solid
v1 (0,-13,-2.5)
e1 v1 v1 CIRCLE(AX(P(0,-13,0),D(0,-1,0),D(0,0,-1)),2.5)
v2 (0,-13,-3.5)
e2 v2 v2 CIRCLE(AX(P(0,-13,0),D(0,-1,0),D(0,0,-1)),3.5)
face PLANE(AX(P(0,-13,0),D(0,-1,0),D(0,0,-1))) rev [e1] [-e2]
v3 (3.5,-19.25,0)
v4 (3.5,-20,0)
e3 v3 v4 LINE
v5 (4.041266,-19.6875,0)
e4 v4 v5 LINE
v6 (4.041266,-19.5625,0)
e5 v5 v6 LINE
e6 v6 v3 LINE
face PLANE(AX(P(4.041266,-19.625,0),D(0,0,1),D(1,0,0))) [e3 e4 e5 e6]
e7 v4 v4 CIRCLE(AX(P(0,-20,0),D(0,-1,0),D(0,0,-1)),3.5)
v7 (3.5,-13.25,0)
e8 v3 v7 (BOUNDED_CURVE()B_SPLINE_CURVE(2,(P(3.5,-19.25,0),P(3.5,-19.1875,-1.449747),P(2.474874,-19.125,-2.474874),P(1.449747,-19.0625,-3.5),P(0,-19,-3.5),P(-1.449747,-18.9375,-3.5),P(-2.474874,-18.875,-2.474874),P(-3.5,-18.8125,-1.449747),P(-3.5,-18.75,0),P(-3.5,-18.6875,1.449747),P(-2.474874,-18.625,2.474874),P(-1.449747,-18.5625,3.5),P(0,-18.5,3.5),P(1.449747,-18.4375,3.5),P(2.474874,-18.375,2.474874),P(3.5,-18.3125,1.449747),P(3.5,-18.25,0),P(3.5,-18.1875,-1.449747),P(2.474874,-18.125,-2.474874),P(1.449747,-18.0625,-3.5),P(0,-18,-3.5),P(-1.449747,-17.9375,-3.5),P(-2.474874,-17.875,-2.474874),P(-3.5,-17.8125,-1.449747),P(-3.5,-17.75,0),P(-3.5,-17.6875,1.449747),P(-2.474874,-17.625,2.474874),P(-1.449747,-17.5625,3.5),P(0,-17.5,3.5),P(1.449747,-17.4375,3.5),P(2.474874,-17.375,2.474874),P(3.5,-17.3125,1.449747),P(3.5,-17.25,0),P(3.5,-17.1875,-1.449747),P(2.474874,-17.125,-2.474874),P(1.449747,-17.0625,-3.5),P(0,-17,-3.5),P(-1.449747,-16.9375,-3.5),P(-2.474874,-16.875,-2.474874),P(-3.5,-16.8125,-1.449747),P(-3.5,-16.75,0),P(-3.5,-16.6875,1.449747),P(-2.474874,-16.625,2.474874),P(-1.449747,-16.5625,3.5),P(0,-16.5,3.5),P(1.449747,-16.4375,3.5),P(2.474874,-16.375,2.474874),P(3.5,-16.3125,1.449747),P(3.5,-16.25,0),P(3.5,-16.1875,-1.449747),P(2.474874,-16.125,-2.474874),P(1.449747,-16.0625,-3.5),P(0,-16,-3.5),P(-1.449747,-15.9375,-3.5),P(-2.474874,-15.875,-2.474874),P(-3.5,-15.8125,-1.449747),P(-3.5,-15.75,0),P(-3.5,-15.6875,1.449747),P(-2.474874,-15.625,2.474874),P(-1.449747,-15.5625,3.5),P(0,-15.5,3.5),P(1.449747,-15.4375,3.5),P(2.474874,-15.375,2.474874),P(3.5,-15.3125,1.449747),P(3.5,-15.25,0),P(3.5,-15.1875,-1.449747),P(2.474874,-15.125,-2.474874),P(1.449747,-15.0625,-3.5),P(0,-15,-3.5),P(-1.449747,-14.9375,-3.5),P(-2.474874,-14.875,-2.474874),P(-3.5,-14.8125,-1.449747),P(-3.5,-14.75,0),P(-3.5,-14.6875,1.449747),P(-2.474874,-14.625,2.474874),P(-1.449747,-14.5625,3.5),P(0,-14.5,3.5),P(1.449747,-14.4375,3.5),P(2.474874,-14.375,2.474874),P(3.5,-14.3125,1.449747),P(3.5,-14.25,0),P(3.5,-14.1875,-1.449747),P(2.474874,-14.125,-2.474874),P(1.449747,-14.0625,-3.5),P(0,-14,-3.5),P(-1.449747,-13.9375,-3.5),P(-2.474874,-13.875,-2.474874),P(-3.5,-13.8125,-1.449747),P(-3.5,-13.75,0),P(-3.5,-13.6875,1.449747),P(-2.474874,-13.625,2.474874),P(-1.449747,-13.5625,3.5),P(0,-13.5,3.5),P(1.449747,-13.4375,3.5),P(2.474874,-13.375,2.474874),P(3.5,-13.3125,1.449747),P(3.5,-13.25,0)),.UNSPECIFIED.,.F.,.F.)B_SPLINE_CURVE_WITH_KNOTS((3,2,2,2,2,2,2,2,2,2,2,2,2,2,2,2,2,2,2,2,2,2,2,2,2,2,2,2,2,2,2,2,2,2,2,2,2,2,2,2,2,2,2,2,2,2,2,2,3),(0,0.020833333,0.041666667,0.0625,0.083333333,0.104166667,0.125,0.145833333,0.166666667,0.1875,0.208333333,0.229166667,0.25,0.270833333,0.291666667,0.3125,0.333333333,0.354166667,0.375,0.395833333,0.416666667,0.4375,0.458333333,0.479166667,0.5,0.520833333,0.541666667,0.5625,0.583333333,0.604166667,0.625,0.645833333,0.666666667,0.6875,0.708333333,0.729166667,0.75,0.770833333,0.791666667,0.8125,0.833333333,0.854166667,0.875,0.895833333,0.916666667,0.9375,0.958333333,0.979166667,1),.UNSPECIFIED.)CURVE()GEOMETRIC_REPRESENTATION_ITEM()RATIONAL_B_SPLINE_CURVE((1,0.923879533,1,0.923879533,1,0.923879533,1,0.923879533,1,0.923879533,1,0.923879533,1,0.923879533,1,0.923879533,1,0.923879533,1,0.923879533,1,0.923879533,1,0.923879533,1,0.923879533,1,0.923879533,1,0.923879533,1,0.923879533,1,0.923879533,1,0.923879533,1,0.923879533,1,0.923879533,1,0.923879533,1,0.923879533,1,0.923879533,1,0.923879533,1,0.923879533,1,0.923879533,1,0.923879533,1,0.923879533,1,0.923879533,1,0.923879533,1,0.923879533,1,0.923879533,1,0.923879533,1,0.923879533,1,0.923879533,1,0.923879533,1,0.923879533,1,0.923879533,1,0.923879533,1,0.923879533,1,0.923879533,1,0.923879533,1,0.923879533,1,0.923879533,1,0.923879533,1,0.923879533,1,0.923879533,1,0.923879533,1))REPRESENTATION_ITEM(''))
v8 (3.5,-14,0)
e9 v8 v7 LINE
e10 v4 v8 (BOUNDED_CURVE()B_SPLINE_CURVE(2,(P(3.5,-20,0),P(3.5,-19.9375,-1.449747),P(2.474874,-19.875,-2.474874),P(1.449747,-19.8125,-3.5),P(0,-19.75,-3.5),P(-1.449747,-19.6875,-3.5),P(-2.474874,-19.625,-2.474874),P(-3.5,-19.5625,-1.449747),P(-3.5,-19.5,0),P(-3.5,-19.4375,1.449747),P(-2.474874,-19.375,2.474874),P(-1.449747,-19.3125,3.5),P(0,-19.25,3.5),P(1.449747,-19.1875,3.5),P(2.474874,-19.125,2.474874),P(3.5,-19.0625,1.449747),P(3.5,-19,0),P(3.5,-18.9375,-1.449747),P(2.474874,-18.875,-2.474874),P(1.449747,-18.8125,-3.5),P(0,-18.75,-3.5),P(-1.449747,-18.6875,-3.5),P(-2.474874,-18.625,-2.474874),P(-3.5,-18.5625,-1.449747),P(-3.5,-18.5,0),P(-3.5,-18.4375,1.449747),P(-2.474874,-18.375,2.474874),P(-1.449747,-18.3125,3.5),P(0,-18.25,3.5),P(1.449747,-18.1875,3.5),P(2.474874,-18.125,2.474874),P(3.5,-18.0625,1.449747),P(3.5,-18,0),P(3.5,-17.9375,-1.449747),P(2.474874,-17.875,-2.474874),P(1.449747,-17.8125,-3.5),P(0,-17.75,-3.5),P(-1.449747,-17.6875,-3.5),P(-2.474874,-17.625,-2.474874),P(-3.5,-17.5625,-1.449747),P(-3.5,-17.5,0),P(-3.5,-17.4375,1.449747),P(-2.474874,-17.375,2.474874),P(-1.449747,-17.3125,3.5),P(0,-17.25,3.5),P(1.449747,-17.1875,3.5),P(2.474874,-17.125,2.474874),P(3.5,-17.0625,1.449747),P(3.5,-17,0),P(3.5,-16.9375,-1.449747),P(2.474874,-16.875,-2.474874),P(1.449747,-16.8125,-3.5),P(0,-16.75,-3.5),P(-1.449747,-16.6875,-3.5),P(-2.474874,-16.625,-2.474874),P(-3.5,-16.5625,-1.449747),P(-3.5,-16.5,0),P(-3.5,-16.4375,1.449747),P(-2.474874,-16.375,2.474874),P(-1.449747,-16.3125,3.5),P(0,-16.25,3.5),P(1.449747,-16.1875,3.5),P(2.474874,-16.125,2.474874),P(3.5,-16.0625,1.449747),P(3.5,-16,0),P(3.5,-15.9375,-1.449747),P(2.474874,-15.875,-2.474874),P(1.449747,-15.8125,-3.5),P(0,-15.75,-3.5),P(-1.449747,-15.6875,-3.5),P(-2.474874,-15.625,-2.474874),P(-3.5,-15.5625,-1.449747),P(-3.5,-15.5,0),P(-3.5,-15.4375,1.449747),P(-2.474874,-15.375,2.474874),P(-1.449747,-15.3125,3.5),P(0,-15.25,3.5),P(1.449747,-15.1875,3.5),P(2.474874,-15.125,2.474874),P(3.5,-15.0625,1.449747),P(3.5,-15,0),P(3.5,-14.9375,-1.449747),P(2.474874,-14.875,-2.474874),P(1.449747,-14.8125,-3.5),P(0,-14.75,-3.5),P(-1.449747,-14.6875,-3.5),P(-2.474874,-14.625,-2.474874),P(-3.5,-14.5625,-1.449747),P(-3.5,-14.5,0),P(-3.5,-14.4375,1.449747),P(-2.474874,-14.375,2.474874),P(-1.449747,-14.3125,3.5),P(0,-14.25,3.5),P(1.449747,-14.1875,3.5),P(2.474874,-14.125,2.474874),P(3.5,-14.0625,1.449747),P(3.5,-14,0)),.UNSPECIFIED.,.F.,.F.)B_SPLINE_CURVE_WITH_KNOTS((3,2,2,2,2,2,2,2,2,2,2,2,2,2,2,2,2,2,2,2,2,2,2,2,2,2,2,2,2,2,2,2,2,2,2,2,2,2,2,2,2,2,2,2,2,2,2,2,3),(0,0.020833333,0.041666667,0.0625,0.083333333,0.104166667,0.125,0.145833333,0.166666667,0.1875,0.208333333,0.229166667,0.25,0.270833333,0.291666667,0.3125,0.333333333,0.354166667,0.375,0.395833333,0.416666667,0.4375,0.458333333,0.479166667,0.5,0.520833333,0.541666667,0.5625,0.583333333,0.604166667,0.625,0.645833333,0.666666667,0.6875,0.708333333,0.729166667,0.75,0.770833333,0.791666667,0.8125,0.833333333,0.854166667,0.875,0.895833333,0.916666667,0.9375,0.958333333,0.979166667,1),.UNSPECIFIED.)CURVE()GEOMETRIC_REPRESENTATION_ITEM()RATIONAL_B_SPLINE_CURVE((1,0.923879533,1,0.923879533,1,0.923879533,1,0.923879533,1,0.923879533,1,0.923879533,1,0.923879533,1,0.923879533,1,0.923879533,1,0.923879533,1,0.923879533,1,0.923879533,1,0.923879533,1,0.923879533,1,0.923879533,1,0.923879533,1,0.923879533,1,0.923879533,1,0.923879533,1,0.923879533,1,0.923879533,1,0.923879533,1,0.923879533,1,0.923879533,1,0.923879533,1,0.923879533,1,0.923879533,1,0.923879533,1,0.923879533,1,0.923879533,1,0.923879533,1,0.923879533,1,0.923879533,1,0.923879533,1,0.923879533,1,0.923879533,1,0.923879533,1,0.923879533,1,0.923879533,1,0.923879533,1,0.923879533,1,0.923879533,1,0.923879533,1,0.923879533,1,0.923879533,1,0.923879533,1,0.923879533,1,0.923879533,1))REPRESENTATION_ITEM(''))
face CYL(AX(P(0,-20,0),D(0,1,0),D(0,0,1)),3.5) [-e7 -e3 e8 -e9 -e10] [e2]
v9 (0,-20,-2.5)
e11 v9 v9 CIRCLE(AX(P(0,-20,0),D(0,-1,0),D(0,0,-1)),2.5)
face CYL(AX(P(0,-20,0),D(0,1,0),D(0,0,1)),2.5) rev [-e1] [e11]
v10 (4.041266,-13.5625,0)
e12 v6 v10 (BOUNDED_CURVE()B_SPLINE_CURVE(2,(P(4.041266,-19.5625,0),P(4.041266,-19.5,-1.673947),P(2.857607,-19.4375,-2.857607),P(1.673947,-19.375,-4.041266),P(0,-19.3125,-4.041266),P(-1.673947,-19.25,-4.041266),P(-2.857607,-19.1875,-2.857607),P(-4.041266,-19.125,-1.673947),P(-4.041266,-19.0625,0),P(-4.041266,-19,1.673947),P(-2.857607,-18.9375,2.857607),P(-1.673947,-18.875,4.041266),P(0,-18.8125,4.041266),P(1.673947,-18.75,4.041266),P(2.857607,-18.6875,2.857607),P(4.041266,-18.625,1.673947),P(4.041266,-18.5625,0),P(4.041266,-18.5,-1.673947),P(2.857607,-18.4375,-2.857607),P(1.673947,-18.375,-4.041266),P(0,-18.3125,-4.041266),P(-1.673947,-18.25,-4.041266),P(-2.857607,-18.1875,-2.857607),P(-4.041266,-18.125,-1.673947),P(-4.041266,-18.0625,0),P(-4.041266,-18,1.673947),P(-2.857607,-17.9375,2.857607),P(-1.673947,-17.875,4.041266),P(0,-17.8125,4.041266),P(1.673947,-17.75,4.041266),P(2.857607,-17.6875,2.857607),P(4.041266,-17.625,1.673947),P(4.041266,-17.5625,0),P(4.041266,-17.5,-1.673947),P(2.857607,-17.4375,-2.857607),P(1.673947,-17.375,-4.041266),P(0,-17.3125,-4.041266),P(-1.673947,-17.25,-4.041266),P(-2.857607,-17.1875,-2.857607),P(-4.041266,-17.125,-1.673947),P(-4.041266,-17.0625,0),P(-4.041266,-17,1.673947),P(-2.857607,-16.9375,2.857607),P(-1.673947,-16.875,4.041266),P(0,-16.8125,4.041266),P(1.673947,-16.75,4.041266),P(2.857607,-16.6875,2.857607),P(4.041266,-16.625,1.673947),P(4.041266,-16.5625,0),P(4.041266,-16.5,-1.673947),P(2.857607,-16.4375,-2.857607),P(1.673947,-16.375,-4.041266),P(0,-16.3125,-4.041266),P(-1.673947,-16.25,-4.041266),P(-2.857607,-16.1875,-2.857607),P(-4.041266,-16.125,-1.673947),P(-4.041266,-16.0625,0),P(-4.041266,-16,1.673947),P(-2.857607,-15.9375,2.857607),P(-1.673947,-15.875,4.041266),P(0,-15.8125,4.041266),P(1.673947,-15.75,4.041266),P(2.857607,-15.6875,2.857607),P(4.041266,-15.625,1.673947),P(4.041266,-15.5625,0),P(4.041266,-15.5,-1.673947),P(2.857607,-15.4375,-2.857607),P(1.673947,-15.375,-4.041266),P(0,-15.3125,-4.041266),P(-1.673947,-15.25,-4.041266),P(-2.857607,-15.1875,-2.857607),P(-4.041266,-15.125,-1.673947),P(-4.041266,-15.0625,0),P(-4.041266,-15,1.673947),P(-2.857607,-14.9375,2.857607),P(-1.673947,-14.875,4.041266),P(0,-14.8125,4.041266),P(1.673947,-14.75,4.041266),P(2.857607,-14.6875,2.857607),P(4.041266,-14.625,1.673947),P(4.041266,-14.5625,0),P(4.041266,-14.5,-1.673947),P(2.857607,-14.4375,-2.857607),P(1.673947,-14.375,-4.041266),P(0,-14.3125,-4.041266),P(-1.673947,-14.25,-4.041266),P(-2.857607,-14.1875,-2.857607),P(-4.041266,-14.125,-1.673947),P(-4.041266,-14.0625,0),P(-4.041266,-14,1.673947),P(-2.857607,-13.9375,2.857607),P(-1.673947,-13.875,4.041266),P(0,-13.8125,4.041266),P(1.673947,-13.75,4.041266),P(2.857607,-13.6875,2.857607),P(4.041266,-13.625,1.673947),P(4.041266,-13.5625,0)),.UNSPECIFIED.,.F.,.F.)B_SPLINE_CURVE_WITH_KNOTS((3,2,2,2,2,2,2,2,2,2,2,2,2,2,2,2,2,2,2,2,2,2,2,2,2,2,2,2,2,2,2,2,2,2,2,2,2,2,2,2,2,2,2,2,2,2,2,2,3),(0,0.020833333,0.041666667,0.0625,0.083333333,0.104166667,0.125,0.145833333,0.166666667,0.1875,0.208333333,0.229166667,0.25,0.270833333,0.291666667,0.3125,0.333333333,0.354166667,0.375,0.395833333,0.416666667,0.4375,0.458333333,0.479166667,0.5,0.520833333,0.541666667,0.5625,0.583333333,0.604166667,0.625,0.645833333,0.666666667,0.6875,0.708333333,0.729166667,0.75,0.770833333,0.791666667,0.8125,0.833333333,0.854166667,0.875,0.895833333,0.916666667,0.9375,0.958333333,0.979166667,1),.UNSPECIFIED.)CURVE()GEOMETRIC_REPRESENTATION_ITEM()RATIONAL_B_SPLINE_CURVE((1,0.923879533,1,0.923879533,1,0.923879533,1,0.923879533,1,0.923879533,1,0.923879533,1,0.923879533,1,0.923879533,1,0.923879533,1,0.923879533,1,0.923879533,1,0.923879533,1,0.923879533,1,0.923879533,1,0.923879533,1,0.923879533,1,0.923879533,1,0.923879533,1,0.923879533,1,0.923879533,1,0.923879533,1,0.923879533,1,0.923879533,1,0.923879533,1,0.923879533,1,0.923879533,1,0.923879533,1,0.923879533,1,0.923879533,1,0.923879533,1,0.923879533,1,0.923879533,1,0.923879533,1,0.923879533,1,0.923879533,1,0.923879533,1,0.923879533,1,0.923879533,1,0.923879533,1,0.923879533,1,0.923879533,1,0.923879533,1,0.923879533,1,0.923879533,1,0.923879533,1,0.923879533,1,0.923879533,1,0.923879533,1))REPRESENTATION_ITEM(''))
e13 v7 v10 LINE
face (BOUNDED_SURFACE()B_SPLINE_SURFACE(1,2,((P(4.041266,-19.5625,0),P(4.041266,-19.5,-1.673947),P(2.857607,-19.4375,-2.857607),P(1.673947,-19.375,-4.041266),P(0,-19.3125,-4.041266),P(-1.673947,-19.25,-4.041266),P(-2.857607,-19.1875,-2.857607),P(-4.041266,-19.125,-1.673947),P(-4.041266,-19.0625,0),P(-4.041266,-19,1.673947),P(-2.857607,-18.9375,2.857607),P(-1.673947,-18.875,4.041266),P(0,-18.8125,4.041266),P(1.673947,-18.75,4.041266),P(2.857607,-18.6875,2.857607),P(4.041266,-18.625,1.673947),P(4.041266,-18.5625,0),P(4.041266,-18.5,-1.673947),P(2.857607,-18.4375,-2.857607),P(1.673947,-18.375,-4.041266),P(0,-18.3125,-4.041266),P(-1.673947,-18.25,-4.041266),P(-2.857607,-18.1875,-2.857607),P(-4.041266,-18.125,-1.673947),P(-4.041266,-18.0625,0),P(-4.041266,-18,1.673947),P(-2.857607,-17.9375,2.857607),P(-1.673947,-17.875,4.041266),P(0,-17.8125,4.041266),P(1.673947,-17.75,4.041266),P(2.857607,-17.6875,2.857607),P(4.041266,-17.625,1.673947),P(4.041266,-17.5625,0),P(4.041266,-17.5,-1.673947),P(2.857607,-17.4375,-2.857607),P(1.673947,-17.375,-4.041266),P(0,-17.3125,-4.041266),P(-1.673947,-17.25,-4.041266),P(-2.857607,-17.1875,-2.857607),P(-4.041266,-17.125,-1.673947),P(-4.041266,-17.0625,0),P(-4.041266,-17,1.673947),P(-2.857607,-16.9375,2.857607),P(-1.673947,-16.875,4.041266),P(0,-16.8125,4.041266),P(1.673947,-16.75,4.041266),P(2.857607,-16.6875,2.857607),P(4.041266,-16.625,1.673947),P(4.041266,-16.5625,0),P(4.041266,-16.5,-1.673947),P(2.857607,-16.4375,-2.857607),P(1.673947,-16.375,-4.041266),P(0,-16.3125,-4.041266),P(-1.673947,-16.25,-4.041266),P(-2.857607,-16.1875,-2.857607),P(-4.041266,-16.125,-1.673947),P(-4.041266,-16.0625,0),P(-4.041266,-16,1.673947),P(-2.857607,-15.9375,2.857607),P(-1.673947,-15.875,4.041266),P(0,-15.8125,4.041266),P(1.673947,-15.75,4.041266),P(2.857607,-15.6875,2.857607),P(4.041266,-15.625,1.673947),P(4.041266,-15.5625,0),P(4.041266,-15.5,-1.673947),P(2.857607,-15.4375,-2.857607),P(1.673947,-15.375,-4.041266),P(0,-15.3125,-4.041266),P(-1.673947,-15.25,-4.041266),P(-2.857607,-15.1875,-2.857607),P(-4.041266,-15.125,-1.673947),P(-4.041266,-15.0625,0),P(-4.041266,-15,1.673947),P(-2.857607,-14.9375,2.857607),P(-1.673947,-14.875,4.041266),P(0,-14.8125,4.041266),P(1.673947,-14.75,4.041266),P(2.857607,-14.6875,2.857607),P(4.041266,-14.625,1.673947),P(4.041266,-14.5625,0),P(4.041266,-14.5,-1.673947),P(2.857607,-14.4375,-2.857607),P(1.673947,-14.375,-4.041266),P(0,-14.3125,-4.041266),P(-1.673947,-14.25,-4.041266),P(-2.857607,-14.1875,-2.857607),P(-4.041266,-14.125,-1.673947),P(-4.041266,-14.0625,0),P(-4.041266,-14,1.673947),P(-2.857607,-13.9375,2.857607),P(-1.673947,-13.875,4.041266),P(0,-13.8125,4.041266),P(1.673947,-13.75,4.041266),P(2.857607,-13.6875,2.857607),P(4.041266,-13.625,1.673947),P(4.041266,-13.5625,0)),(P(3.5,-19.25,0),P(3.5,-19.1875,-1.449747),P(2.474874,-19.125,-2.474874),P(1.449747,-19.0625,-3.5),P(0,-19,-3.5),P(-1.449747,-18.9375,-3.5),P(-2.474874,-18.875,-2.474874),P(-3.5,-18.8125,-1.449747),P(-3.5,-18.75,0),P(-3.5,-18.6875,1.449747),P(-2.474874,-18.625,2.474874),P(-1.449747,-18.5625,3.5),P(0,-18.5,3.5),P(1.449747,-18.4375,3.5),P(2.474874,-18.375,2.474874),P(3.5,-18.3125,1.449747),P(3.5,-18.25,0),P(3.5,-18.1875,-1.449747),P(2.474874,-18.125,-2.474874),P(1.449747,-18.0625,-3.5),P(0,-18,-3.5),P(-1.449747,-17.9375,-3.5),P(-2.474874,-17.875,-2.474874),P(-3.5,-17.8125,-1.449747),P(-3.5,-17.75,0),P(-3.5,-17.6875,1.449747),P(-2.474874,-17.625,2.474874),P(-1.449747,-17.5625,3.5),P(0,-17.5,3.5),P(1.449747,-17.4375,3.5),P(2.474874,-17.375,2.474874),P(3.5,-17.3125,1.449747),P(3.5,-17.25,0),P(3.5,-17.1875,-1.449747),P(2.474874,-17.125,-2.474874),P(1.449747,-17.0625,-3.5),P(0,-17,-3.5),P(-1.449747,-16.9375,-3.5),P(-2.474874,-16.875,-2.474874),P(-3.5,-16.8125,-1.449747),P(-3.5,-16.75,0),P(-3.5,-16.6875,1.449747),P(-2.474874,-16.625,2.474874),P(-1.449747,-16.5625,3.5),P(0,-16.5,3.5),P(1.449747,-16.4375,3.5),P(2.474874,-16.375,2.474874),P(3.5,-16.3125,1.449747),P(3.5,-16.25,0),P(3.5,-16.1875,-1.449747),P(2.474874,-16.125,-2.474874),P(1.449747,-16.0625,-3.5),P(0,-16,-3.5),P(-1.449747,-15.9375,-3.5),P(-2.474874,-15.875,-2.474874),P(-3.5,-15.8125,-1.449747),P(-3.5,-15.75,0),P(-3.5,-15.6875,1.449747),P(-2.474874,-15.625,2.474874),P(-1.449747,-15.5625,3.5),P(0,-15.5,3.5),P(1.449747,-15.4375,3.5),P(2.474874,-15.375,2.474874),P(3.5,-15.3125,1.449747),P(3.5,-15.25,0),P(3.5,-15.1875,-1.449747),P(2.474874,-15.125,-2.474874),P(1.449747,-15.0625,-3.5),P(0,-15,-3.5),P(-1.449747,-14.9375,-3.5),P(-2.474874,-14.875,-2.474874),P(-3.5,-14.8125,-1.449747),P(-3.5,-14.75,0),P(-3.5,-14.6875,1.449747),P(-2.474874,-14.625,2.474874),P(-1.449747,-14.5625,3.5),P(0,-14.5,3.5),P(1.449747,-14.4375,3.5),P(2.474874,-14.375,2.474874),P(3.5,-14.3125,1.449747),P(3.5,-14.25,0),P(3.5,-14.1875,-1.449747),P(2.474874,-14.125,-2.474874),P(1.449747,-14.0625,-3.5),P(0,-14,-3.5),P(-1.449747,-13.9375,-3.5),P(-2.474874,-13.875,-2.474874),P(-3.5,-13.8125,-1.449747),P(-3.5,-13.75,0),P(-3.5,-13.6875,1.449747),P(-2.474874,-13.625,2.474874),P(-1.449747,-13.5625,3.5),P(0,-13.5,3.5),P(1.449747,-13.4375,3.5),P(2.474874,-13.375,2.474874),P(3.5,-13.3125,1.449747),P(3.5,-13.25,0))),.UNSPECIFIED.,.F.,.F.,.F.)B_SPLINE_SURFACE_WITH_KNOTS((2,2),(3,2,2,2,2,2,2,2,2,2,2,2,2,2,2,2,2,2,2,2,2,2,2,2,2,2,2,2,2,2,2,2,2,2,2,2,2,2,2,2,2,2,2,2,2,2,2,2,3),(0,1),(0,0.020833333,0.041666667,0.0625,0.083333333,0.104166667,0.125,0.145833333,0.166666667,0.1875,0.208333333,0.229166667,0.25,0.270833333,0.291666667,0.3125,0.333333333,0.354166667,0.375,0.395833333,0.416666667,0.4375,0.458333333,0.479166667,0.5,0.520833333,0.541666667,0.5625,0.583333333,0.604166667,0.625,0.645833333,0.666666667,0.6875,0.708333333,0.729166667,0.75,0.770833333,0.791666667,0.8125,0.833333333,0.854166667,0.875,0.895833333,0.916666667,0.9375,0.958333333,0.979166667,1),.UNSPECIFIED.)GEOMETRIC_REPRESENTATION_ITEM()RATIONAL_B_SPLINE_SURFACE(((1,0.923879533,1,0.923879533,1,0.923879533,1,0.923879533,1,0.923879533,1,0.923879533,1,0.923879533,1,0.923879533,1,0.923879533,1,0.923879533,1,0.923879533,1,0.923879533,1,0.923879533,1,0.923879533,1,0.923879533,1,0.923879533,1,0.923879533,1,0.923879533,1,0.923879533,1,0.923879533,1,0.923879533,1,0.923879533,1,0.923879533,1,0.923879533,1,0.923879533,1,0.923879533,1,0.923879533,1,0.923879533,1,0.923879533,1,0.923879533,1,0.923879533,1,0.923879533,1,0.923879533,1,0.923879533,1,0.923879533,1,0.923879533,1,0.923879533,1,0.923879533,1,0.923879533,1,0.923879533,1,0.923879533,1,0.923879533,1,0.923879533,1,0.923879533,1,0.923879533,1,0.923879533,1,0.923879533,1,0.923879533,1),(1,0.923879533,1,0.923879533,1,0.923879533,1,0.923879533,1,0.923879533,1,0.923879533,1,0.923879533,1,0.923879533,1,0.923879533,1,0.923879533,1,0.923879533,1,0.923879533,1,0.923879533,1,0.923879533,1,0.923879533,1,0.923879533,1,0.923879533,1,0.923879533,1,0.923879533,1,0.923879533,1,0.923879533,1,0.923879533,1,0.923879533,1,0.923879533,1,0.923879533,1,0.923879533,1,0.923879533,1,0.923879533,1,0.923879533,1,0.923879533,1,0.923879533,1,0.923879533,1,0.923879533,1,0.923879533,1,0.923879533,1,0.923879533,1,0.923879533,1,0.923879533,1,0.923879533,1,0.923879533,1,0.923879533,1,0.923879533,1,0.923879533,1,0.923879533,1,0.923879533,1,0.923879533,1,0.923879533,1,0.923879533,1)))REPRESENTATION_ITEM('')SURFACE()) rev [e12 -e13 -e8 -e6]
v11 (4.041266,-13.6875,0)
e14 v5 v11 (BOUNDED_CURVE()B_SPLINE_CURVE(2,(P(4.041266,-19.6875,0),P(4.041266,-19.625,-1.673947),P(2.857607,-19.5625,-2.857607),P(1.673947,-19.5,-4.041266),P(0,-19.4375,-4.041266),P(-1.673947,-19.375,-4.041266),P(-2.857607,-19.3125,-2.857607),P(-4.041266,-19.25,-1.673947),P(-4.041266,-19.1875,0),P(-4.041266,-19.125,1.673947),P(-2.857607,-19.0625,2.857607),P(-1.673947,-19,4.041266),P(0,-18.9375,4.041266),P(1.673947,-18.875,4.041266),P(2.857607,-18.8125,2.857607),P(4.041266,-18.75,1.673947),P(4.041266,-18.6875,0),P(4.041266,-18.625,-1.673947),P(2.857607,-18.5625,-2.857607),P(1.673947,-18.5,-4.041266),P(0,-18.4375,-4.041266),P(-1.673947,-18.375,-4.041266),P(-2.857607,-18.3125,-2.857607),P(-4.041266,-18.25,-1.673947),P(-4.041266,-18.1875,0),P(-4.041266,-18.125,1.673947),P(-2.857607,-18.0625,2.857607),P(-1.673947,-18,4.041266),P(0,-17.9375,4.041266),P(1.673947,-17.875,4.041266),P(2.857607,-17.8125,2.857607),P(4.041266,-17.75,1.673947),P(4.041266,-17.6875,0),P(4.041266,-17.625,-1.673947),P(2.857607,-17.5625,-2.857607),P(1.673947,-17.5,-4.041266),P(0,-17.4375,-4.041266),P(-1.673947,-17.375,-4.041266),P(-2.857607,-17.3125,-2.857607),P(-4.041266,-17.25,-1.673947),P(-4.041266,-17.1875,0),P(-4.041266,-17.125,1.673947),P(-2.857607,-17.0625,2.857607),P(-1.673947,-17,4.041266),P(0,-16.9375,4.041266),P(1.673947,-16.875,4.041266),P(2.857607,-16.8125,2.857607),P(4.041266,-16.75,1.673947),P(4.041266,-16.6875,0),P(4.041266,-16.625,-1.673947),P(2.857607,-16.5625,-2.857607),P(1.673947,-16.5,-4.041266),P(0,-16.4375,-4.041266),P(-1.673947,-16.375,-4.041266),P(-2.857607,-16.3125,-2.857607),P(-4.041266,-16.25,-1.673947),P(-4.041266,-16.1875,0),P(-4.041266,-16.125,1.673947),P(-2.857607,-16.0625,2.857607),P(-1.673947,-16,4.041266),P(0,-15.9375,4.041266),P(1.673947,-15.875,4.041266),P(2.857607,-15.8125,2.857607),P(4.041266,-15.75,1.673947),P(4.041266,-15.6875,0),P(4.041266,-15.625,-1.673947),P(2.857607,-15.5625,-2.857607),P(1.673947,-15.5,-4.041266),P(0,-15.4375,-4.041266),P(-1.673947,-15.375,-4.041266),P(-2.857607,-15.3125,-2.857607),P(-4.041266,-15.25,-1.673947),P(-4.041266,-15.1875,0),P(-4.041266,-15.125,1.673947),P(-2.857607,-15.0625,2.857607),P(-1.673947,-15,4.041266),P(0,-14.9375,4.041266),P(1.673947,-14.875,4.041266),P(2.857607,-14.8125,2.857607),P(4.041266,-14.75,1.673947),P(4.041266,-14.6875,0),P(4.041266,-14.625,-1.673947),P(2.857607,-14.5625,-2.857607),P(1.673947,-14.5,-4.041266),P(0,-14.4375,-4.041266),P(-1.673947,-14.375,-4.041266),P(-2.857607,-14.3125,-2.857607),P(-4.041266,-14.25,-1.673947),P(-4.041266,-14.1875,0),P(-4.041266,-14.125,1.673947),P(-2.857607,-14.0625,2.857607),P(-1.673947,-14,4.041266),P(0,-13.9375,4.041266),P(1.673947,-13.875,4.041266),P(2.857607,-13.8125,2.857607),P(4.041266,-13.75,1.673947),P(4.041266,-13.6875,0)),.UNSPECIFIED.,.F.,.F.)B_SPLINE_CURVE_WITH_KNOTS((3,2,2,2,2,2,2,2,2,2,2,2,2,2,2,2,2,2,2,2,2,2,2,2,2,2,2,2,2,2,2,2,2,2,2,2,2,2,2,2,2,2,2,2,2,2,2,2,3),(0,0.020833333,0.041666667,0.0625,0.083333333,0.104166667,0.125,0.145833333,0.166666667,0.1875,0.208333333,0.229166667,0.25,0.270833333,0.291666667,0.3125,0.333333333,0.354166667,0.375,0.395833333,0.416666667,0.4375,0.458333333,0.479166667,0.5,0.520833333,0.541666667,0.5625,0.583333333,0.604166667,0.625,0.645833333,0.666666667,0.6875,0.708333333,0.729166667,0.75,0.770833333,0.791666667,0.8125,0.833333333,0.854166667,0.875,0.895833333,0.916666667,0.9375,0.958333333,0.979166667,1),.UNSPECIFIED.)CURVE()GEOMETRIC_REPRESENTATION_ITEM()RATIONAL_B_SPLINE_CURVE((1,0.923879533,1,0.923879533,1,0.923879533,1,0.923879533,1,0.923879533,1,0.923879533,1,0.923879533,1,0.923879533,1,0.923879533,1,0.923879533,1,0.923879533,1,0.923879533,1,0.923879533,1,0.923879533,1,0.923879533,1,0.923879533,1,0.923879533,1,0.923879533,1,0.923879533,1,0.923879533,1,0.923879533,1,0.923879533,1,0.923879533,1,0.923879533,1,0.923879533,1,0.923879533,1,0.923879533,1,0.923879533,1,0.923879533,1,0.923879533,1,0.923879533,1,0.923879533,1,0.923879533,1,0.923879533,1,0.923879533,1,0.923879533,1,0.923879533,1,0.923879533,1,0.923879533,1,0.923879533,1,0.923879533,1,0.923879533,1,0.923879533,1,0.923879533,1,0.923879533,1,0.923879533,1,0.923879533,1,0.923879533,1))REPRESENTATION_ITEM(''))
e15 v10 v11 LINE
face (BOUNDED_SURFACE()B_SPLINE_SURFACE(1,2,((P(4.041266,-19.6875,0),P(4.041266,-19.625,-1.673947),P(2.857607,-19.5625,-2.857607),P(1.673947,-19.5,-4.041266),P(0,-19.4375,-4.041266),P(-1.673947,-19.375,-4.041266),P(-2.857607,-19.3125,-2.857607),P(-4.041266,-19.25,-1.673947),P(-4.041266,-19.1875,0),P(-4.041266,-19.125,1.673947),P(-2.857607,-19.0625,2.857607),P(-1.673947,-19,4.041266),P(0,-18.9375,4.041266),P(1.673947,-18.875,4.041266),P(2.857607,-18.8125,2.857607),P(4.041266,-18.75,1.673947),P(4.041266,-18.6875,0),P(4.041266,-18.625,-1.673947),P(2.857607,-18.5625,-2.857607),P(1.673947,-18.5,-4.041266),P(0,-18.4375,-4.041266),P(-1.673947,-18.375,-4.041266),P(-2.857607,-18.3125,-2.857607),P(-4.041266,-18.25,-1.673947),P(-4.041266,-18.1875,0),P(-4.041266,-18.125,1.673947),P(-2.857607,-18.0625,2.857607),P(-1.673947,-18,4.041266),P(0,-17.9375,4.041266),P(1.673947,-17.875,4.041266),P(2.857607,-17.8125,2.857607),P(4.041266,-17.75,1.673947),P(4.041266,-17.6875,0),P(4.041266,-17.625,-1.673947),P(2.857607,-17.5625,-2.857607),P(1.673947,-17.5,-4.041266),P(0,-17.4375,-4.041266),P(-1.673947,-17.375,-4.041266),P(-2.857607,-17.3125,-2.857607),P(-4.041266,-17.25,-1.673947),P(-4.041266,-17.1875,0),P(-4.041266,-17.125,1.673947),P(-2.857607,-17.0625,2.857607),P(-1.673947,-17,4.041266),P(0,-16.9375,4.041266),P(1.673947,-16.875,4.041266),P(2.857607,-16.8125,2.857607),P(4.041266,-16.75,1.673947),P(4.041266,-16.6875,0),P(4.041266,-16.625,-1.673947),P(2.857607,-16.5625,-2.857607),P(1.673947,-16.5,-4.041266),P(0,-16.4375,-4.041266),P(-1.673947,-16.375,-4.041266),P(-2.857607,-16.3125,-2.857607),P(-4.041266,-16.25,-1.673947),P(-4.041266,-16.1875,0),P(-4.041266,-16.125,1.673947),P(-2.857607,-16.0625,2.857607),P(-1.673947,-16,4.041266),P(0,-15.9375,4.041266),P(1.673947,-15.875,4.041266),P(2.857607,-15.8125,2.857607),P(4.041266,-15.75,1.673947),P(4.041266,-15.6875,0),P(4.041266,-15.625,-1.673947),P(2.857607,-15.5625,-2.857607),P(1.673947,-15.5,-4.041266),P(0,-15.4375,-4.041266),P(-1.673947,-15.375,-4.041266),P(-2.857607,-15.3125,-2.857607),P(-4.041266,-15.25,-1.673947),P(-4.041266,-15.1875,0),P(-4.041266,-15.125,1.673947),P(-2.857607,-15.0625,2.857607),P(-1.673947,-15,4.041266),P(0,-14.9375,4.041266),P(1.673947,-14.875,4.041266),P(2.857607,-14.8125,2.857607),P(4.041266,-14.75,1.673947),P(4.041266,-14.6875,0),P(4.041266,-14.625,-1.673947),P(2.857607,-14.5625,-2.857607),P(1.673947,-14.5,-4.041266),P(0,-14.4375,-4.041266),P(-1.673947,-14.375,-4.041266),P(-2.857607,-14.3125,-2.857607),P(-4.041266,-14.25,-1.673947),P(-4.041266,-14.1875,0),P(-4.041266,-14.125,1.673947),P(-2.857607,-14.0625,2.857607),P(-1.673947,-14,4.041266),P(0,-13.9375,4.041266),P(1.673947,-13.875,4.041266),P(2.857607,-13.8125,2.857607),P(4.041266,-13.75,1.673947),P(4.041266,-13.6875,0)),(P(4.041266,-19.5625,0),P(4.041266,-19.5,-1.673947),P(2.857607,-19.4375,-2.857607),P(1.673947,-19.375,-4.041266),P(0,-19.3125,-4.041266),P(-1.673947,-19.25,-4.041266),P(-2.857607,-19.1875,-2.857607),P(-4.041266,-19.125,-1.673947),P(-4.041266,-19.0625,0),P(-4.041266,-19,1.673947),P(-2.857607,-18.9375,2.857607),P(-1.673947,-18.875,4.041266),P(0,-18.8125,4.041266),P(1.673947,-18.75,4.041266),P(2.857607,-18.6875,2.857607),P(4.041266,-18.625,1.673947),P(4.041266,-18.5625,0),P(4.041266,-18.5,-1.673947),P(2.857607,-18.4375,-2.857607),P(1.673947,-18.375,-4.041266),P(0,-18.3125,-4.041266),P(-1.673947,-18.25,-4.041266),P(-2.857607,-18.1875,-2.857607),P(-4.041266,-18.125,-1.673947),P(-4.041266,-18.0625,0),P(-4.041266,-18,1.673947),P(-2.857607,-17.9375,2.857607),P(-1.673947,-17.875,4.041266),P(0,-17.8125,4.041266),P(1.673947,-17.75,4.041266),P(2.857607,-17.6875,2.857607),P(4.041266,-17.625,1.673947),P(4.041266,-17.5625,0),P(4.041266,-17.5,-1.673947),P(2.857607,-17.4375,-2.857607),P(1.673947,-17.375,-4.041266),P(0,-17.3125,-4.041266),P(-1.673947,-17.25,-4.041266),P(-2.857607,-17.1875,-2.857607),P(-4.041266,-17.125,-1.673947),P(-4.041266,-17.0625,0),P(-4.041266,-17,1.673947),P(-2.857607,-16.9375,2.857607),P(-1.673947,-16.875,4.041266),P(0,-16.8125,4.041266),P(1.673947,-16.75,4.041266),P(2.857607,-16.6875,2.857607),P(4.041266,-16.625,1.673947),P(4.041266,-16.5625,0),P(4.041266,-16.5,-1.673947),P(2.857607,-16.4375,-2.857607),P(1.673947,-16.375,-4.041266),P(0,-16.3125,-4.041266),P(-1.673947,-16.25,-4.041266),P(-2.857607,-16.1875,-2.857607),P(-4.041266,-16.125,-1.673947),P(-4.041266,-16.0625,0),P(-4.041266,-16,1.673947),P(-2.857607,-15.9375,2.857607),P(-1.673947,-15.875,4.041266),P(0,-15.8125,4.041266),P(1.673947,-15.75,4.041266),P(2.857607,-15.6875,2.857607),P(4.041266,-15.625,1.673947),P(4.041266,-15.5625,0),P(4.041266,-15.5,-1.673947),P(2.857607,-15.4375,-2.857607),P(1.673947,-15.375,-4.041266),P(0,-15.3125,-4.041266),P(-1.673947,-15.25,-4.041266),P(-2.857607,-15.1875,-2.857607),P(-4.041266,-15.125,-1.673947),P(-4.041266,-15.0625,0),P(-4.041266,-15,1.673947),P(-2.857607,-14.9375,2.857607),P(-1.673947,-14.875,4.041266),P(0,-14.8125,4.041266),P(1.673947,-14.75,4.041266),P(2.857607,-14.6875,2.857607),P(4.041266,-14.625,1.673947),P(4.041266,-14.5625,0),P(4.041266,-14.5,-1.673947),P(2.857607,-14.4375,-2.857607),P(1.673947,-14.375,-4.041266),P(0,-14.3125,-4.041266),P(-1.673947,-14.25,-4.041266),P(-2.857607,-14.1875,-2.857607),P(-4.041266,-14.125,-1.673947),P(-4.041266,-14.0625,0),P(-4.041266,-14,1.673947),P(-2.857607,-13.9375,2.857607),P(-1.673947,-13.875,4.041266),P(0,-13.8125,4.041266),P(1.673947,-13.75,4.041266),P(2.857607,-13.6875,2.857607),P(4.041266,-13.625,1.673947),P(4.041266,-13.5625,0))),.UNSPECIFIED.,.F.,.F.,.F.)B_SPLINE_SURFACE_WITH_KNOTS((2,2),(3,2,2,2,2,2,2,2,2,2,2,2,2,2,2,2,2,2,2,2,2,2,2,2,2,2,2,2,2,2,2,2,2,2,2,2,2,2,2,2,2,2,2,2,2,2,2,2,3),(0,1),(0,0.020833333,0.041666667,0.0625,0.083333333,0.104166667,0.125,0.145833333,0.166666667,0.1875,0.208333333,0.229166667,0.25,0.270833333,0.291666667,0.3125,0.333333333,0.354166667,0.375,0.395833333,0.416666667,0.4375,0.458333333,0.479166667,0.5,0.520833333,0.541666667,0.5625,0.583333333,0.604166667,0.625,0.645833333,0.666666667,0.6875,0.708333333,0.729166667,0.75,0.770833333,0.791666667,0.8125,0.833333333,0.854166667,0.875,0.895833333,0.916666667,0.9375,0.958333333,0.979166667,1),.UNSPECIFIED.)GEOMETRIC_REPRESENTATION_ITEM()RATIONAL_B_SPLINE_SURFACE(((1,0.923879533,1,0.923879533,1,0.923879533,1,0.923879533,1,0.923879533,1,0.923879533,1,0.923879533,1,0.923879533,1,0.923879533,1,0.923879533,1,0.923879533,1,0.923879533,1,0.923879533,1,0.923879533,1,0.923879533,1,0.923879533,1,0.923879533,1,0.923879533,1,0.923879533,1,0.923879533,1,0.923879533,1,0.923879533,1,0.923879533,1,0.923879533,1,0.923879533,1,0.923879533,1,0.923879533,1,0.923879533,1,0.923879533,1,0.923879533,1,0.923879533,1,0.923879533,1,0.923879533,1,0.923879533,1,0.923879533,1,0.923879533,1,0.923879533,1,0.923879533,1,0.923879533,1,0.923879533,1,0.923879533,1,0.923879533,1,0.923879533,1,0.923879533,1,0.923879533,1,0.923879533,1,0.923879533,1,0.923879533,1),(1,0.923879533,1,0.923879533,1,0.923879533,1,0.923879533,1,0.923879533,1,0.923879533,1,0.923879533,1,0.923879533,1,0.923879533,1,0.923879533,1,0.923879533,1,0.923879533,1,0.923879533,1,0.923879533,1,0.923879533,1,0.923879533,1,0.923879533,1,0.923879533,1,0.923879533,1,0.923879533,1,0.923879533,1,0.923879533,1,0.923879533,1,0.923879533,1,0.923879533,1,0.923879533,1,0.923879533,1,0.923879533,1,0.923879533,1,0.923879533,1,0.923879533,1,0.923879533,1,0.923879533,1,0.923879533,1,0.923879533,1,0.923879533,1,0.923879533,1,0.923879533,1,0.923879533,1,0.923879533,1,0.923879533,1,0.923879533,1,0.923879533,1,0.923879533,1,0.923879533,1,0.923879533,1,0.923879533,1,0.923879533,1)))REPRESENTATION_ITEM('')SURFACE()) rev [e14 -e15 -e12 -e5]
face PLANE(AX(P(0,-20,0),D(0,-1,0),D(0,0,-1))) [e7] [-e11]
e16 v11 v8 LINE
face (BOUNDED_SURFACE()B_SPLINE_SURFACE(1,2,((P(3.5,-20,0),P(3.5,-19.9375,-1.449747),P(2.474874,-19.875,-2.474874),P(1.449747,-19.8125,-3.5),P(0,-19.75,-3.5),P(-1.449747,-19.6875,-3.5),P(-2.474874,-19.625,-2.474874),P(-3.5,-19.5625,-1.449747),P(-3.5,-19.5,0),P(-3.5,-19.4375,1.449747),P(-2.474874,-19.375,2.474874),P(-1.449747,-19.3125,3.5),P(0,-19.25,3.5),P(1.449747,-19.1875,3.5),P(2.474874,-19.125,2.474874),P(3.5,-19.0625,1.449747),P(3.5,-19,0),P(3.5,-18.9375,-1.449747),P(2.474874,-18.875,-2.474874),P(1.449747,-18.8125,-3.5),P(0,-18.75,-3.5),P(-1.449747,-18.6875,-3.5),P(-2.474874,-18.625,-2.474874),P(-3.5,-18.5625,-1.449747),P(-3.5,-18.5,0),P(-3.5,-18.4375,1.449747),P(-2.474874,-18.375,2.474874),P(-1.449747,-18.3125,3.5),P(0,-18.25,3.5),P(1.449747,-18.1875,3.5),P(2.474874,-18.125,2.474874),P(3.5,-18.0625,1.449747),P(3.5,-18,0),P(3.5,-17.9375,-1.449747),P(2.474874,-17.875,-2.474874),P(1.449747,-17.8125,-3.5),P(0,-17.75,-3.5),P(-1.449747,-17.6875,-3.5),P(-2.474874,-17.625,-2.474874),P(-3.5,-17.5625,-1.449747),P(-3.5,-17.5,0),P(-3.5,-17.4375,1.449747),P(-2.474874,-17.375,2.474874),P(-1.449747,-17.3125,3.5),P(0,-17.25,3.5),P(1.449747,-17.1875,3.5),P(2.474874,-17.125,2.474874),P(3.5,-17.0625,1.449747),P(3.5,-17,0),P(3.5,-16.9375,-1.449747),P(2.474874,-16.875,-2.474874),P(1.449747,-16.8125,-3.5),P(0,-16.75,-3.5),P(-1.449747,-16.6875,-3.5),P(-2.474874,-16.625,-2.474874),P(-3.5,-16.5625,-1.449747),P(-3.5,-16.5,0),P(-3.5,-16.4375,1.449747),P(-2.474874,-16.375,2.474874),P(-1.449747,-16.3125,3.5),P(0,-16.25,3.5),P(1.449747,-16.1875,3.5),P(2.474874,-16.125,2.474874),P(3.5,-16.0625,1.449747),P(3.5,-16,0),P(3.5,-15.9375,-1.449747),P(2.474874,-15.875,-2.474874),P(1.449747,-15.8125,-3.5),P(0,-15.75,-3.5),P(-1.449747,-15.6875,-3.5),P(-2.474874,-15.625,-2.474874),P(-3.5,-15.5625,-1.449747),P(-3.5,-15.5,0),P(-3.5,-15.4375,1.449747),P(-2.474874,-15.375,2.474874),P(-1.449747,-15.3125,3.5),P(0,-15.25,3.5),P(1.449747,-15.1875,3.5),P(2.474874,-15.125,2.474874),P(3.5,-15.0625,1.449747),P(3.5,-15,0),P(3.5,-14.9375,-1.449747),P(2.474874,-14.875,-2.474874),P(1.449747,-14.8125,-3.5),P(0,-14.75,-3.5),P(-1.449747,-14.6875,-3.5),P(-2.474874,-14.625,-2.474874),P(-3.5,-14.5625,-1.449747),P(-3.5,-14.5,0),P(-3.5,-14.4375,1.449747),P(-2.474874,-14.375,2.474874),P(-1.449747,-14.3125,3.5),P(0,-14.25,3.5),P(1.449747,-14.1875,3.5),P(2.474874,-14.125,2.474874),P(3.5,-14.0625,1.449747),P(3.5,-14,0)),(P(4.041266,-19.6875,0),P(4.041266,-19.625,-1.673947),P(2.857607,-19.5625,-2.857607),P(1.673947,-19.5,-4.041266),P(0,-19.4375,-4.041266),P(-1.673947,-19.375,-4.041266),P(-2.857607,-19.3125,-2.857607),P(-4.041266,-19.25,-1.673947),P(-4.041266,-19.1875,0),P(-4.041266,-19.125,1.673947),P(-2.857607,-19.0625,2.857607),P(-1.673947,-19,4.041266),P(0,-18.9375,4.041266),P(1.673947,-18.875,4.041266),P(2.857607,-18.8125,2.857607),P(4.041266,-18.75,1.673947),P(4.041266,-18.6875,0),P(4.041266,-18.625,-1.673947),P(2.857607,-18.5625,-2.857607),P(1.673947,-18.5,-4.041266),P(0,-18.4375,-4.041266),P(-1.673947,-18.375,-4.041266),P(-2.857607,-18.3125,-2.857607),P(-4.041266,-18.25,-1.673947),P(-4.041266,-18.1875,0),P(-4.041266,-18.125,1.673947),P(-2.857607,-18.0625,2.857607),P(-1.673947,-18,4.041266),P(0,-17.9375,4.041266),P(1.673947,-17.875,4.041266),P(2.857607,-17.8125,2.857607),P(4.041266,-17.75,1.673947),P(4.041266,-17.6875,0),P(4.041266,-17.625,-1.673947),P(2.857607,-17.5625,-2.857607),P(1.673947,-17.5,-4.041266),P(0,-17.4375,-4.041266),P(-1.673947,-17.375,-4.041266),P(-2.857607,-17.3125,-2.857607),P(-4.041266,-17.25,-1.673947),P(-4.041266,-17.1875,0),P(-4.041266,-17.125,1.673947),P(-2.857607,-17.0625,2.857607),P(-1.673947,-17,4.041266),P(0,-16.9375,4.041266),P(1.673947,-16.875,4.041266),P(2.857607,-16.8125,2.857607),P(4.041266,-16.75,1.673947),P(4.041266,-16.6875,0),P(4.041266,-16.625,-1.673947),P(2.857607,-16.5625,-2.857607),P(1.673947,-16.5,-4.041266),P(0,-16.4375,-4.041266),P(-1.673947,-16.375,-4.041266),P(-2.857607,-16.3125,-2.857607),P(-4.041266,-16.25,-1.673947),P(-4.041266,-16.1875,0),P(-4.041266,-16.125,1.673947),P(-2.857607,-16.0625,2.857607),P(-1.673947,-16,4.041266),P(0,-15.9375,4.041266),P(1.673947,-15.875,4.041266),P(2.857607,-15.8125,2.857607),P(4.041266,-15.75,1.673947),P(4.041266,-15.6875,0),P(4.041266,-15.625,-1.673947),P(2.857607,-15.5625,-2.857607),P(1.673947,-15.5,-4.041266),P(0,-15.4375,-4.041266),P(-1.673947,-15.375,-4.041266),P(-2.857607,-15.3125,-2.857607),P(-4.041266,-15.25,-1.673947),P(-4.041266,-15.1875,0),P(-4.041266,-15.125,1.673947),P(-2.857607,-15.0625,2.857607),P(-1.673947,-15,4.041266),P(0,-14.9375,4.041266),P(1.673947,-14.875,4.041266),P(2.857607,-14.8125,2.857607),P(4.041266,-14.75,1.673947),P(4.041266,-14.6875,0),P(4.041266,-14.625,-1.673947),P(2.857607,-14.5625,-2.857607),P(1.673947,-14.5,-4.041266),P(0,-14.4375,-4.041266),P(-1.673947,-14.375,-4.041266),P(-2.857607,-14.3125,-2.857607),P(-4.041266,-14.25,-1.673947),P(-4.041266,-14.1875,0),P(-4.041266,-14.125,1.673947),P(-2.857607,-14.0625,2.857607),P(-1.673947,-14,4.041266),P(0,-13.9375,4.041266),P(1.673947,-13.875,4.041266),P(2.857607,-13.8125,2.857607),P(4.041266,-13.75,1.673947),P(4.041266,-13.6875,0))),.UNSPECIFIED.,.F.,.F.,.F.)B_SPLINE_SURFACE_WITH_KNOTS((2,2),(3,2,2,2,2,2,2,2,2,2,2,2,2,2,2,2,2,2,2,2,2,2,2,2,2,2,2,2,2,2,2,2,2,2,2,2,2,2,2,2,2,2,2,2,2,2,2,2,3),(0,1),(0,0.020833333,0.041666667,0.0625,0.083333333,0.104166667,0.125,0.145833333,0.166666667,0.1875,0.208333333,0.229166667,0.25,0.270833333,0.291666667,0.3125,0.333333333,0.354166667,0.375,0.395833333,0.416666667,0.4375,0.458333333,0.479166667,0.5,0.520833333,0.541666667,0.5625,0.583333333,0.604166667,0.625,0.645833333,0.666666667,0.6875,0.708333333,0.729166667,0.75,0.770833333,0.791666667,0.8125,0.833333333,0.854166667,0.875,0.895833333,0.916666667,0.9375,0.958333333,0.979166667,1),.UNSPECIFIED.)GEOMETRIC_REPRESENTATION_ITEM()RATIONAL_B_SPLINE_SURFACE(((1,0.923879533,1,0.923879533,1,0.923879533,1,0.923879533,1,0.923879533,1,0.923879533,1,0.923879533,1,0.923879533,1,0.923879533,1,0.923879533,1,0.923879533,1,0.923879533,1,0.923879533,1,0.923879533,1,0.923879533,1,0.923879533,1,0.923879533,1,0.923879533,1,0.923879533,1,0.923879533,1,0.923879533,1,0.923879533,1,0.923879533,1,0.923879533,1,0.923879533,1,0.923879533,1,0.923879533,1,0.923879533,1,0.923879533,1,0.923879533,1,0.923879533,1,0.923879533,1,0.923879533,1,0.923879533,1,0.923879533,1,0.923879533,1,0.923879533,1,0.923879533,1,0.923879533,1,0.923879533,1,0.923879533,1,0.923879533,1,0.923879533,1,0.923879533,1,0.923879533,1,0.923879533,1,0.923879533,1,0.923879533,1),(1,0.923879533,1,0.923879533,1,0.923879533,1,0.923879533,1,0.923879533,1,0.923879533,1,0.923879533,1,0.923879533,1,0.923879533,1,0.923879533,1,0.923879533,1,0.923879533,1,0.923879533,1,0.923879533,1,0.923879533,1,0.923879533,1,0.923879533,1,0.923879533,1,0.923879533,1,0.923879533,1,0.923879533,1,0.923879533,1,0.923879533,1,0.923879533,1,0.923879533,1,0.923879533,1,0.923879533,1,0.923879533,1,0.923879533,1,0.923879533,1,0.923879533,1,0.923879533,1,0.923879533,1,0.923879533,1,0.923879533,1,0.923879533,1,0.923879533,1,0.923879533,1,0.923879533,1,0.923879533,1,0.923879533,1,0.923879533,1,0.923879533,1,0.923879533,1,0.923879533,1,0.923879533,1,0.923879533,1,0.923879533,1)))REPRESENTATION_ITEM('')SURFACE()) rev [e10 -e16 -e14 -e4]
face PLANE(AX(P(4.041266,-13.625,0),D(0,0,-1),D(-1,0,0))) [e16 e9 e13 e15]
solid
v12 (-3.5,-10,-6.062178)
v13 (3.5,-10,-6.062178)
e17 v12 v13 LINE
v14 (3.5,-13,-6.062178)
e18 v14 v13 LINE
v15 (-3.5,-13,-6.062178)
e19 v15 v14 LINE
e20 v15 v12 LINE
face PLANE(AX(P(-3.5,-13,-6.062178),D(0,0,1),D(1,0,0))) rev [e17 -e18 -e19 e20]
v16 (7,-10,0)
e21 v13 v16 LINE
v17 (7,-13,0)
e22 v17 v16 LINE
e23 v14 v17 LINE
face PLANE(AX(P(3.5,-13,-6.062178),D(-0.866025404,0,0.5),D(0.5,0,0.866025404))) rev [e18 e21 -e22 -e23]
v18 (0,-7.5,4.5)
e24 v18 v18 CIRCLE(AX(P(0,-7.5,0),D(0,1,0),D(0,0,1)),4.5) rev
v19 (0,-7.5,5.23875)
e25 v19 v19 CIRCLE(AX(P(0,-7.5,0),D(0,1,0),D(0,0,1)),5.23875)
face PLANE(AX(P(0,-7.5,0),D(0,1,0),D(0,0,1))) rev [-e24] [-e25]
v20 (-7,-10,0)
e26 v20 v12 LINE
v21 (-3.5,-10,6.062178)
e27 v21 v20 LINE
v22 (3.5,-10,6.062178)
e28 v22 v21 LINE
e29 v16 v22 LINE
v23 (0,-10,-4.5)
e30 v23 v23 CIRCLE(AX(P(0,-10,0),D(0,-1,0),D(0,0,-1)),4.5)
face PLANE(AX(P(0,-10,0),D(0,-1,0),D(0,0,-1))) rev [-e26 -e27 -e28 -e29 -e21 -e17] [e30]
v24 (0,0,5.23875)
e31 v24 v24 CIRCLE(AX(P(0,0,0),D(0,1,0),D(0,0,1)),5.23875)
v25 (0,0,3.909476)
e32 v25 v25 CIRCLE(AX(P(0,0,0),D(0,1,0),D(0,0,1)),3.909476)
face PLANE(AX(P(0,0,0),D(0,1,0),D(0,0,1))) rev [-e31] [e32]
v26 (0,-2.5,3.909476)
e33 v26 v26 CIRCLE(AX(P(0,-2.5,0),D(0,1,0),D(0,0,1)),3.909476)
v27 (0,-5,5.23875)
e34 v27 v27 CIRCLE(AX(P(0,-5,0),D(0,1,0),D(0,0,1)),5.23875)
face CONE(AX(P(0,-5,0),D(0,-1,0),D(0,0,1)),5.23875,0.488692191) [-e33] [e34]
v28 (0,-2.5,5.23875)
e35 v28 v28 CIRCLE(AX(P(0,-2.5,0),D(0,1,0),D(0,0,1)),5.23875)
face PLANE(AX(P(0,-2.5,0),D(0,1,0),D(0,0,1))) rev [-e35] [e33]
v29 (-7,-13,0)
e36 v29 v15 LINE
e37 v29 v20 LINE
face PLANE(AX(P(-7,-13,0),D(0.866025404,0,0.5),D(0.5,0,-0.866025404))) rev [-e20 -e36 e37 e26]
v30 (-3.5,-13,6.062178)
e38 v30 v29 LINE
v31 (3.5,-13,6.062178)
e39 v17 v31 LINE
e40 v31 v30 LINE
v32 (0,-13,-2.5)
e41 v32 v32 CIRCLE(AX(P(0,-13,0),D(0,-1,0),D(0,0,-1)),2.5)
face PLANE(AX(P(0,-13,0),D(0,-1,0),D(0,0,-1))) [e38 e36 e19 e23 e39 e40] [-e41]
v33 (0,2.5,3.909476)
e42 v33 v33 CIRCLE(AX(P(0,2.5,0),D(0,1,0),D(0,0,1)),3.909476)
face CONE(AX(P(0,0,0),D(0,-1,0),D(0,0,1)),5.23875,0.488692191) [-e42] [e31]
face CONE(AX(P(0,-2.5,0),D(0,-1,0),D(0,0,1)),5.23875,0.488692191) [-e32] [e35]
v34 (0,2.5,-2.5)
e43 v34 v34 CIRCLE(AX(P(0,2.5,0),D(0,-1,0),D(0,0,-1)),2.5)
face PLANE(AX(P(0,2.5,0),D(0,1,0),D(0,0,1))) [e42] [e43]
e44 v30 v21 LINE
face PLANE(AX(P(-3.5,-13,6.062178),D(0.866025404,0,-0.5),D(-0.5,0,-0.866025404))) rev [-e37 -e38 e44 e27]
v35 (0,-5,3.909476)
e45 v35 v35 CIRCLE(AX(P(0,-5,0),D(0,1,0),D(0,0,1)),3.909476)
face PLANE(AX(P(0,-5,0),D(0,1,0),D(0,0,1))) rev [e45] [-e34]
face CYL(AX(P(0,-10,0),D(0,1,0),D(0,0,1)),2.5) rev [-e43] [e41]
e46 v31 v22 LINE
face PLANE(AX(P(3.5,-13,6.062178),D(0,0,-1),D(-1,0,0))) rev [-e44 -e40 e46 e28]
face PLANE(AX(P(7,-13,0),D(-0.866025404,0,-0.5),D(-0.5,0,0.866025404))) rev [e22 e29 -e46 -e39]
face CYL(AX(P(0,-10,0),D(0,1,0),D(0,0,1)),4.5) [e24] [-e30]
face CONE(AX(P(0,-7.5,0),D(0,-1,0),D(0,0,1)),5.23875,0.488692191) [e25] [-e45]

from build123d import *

# Parameters (mm, degrees)
SKETCH1_R               = 5.23875
BOSS_EXTRUDE1_DEPTH     = 2.5
BOSS_EXTRUDE1_TAPER     = 28
LPATTERN1_COUNT         = 4
LPATTERN1_PITCH         = 2.5
SKETCH3_R               = 4.5
SKETCH3_R_2             = 2.5
BOSS_EXTRUDE2_DEPTH     = 2.5
BOSS_EXTRUDE3_DEPTH     = 3
CUT_EXTRUDE1_DEPTH      = 14.629013244
CUT_EXTRUDE1_DEPTH_BACK = 14.629013244
SKETCH4_R               = 2.5
SKETCH6_R               = 3.5
SKETCH6_R_2             = 2.5
BOSS_EXTRUDE4_DEPTH     = 7
THREAD2_PITCH           = 1


with BuildPart() as part:
    # Sketch1 → Boss-Extrude1 (new body)
    with BuildSketch(Plane(origin=(0, 0, 0), x_dir=(1, 0, 0), z_dir=(0, 1, 0))):
        Circle(SKETCH1_R)
    boss_extrude1 = extrude(amount=BOSS_EXTRUDE1_DEPTH, taper=BOSS_EXTRUDE1_TAPER)

    # LPattern1: Boss-Extrude1 ×4
    with Locations(*[(0, -i * LPATTERN1_PITCH, 0) for i in range(1, LPATTERN1_COUNT)]):
        add(boss_extrude1)

    # Sketch3 → Boss-Extrude2 (add)
    with BuildSketch(Plane.XZ.offset(7.5)):
        with Locations(Location((0, 0, 0), (0, 0, 90))):
            Circle(SKETCH3_R)
        with Locations(Location((0, 0, 0), (0, 0, 270))):
            Circle(SKETCH3_R_2, mode=Mode.SUBTRACT)
    extrude(amount=BOSS_EXTRUDE2_DEPTH)

    # Sketch5 → Boss-Extrude3 (add)
    with BuildSketch(Plane.XZ.offset(10)):
        Polygon((3.5, 6.062177826), (-3.5, 6.062177826), (-7, 0), (-3.5, -6.062177826), (3.5, -6.062177826), (7, 0), align=None)
    extrude(amount=BOSS_EXTRUDE3_DEPTH)

    # Sketch4 → Cut-Extrude1 (cut, two sides: drawn at the far end of the back side and taken through both)
    with BuildSketch(Plane.XZ.offset(7.5).offset(-CUT_EXTRUDE1_DEPTH_BACK)):
        with Locations(Location((0, 0, 0), (0, 0, 270))):
            Circle(SKETCH4_R)
    extrude(amount=CUT_EXTRUDE1_DEPTH + CUT_EXTRUDE1_DEPTH_BACK, mode=Mode.SUBTRACT)


with BuildPart() as body_2:
    # Sketch6 → Boss-Extrude4 (new body)
    with BuildSketch(Plane.XZ.offset(13)):
        with Locations(Location((0, 0, 0), (0, 0, 270))):
            Circle(SKETCH6_R)
        with Locations(Location((0, 0, 0), (0, 0, 270))):
            Circle(SKETCH6_R_2, mode=Mode.SUBTRACT)
    extrude(amount=BOSS_EXTRUDE4_DEPTH)

    # Thread2: the profile of Thread Profile3 profile screwed along a right-hand helix of 6 turns, 8 arcs to a turn; built about Z, then put on its axis
    thread2_z = Axis((0, 0, 0), (0, 0, 1))
    thread2_corners = [(3.4997, 0, -0.000173205), (4.041265875, 0, 0.312499999), (4.041265875, 0, 0.437499999), (3.4997, 0, 0.750173202)]
    with BuildLine(mode=Mode.PRIVATE) as thread2_profile:
        Line(thread2_corners[0], thread2_corners[1])
        Line(thread2_corners[1], thread2_corners[2])
        Line(thread2_corners[2], thread2_corners[3])
        Line(thread2_corners[3], thread2_corners[0])
    thread2_cap = Face(thread2_profile.wire())
    thread2_turn_angles = [0, 22.5, 45, 67.5, 90, 112.5, 135, 157.5, 180, 202.5, 225, 247.5, 270, 292.5, 315, 337.5, 360]
    thread2_turn_weights = [1, 0.9238795325112867, 1, 0.9238795325112867, 1, 0.9238795325112867, 1, 0.9238795325112867, 1, 0.9238795325112867, 1, 0.9238795325112867, 1, 0.9238795325112867, 1, 0.9238795325112867, 1]
    thread2_turn_rails = [Edge.make_bspline([Vector(p[0], p[1], 0).rotate(thread2_z, thread2_turn_angles[k]) / thread2_turn_weights[k] + Vector(0, 0, p[2] + THREAD2_PITCH * thread2_turn_angles[k] / 360) for k in range(17)], [0, 0, 0, 1, 1, 2, 2, 3, 3, 4, 4, 5, 5, 6, 6, 7, 7, 8, 8, 8], 2, thread2_turn_weights) for p in thread2_corners]
    thread2_turn_sides = [Face.make_surface_from_curves(thread2_turn_rails[p[0]], thread2_turn_rails[p[1]]) for p in [(0, 1), (1, 2), (2, 3), (3, 0)]]
    thread2 = Plane(origin=(0, -20, 0), x_dir=(1, 0, 0), z_dir=(0, 1, 0)) * Solid(Shell([*[p.moved(Location((0, 0, THREAD2_PITCH * i))) for i in range(6) for p in thread2_turn_sides], thread2_cap, thread2_cap.rotate(thread2_z, 2160).moved(Location((0, 0, THREAD2_PITCH * 2160 / 360)))]))
    add(thread2)


solid = Compound([part.part, body_2.part])
